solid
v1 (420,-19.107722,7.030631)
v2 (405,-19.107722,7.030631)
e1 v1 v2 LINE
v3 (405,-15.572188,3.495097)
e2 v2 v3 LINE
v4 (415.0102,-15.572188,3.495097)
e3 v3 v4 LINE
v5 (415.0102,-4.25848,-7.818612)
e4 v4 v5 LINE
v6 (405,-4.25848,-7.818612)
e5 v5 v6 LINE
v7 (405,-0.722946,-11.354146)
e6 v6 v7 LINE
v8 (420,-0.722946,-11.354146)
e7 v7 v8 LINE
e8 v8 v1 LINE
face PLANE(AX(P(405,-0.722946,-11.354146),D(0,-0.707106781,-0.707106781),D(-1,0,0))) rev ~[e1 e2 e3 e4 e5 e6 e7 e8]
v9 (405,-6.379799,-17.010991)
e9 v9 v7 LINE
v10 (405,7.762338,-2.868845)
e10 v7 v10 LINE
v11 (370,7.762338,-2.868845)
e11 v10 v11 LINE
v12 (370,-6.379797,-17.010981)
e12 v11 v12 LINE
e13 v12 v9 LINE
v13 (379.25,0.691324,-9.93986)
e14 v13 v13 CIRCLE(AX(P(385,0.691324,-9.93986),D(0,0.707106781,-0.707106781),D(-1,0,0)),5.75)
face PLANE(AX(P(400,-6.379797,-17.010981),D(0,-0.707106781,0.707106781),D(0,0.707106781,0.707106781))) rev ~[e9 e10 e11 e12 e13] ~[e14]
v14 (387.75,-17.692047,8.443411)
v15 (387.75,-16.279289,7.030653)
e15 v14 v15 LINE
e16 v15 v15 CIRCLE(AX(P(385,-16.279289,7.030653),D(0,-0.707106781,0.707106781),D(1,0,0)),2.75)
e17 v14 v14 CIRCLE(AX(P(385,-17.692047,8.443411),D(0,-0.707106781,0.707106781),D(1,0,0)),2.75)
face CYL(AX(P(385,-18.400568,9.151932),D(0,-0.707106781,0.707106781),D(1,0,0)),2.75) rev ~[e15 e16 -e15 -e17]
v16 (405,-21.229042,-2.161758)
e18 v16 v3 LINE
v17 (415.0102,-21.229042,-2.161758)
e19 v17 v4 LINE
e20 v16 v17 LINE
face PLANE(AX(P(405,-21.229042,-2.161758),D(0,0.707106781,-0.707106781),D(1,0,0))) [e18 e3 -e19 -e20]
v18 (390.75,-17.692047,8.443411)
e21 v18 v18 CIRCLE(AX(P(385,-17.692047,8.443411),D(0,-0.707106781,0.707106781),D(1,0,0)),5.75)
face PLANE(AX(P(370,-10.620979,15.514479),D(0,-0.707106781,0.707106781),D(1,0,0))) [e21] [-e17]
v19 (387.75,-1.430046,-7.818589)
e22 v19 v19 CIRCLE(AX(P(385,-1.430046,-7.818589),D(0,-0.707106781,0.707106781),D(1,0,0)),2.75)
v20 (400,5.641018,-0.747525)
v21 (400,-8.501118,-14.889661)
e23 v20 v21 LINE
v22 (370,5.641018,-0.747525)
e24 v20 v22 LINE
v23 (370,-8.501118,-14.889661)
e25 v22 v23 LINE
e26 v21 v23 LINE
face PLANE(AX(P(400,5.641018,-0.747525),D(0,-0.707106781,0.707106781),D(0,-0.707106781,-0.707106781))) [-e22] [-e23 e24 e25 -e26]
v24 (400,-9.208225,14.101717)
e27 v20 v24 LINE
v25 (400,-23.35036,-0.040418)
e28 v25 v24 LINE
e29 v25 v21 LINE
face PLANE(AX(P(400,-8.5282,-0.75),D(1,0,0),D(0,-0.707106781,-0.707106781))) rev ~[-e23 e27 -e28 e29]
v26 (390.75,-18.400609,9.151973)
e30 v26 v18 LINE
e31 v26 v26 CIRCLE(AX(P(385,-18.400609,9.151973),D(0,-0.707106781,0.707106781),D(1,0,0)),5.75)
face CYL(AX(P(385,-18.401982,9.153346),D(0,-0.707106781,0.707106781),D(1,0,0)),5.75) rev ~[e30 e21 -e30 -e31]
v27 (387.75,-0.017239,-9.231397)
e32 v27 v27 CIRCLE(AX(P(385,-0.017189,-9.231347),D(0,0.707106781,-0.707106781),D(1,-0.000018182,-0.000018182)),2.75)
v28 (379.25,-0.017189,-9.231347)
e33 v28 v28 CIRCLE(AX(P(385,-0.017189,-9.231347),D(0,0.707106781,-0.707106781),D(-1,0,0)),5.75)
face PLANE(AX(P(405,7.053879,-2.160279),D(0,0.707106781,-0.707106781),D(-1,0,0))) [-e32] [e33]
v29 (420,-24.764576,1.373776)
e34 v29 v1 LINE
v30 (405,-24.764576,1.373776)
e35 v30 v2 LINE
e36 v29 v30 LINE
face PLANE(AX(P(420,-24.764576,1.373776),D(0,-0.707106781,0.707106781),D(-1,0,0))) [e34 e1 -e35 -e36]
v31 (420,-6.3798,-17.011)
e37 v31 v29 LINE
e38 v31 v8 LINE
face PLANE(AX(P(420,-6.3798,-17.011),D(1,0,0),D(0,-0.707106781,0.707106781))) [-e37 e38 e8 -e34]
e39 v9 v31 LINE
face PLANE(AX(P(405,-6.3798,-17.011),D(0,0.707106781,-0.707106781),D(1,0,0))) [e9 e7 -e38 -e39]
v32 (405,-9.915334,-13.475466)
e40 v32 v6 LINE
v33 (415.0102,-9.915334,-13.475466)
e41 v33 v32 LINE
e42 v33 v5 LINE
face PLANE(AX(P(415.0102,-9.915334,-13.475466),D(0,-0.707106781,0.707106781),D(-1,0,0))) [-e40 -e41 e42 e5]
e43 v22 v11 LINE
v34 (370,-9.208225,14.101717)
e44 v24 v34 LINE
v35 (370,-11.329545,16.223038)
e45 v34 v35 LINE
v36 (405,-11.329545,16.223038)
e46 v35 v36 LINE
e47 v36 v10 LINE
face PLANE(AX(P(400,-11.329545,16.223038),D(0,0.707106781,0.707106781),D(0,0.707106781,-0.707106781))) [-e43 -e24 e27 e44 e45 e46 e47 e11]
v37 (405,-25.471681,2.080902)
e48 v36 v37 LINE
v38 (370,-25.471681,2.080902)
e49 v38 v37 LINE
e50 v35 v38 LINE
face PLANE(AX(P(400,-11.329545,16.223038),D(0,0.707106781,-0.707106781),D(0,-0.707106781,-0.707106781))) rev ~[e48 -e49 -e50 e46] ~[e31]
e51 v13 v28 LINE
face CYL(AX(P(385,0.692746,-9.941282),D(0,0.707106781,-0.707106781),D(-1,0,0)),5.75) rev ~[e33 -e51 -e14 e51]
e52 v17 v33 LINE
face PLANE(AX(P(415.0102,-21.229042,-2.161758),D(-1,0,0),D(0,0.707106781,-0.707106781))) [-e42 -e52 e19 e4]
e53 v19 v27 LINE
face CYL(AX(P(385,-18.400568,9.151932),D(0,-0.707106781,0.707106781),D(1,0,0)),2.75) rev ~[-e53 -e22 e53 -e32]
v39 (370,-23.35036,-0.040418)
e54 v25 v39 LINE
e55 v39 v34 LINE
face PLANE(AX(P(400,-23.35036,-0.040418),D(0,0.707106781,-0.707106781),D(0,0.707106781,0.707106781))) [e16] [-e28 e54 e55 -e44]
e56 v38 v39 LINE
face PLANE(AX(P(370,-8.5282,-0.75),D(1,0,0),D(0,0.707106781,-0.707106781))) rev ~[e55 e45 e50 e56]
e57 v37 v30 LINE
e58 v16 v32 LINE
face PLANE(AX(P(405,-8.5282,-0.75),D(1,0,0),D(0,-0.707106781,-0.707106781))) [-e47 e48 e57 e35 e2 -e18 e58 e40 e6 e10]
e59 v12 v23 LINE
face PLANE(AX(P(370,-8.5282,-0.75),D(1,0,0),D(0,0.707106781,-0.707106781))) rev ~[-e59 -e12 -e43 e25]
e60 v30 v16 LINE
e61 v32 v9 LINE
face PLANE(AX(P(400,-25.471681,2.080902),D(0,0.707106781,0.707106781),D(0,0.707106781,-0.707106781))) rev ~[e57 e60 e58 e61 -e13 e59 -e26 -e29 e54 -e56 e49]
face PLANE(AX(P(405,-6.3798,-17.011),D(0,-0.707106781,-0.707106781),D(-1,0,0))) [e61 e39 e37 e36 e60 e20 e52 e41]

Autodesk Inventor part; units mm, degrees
ref_plane "YZ Plane" through (0, 0, 0) normal (1, 0, 0) x (0, 1, 0)
ref_plane "XZ Plane" through (0, 0, 0) normal (0, 1, 0) x (-1, 0, 0)
ref_plane "XY Plane" through (0, 0, 0) normal (0, 0, 1) x (1, 0, 0)
ref_plane "Work Plane1" through (400, -8.5282, -0.75) normal (1, 0, 0) x (0, 0.7071068, -0.7071068)
sketch "Sketch1" plane through (400, -8.5282, -0.75) normal (1, 0, 0) x (0, 0.7071068, -0.7071068)
  line L0 (-10.9826, 10.0209) -> (10.0174, 10.0209)
  line L1 (10.0174, 10.0209) -> (10.0174, -9.9791)
  line L2 (10.0174, -9.9791) -> (-10.9826, -9.9791)
  line L3 (-10.9826, -9.9791) -> (-10.9826, 10.0209)
  line L4 (10.0174, 10.0209) -> (13.0174, 10.0209)
  line L5 (13.0174, 10.0209) -> (13.0174, -9.9791)
  line L6 (13.0174, -9.9791) -> (10.0174, -9.9791)
  line L7 (10.0174, -9.9791) -> (10.0174, 10.0209)
  line L8 (-10.9826, 10.0209) -> (-13.9826, 10.0209)
  line L9 (-13.9826, 10.0209) -> (-13.9826, -9.9791)
  line L10 (-13.9826, -9.9791) -> (-10.9826, -9.9791)
  line L11 (-10.9826, -9.9791) -> (-10.9826, 10.0209)
  point P0 (5.5, 6.5607)
  point P1 (10.0174, -9.9791)
  point P2 (-10.9826, -9.9791)
  dimension "d0" = 21
  dimension "d1" = 20
  dimension "d2" = 3
  dimension "d3" = 20
  dimension "d4" = 3
  dimension "d5" = 20
extrude "Extrusion1" add sketch "Sketch1" against normal blind 30 contours L3 L10 L9 L8 | L4 L5 L6 L1
sketch "Sketch2" plane through (400, -8.5282, -0.75) normal (1, 0, 0) x (0, -0.7071068, -0.7071068)
  line L0 (-10.0209, -13.9826) -> (-10.0209, -10.9826) projected
  line L1 (9.9791, 13.0174) -> (9.9791, 10.0174) projected
  line L2 (-10.0209, -13.9826) -> (9.9791, -13.9826)
  line L3 (9.9791, -13.9826) -> (9.9791, 13.0174)
  line L4 (9.9791, 13.0174) -> (-10.0209, 13.0174)
  line L5 (-10.0209, 13.0174) -> (-10.0209, -13.9826)
  point P0 (-6.5607, 5.5)
extrude "Extrusion2" add sketch "Sketch2" along normal blind 5
sketch "Sketch3" plane through (405, -6.3798, -17.011) normal (0, -0.7071068, -0.7071068) x (-1, 0, 0)
  line L0 (35, 0) -> (0, 0) projected
  line L1 (0, 0) -> (-15, 0)
  line L2 (-15, 0) -> (-15, -26)
  line L3 (-15, -26) -> (0, -26)
  line L4 (0, -26) -> (0, 0)
  line L5 (-10.0102, -5) -> (0, -5)
  line L6 (0, -5) -> (0, -21)
  line L7 (0, -21) -> (-10.0102, -21)
  line L8 (-10.0102, -21) -> (-10.0102, -5)
  point P0 (405, -7.5174)
  point P1 (0, -21)
  point P2 (0, -5)
  dimension "d10" = 15
  dimension "d11" = 26
  dimension "d12" = 0
  dimension "d13" = 5
  dimension "d14" = 16
extrude "Extrusion3" add sketch "Sketch3" against normal blind 8 contours L4 L5 L8 L7 L3 L2 L1
sketch "Sketch4" plane through (370, -11.3295, 16.223) normal (0, -0.7071068, 0.7071068) x (1, 0, 0)
  circle A0 centre (15, -10) radius 2.75
  line L0 (0, -20) -> (50, -20) projected
  line L1 (0, -20) -> (0, 0) projected
  point P0 (-370, -3.4602)
  dimension "d17" = 5.5
  dimension "d18" = 10
  dimension "d19" = 15
extrude "Extrusion4" cut sketch "Sketch4" against normal through all
sketch "Sketch5" plane through (370, -11.3295, 16.223) normal (0, -0.7071068, 0.7071068) x (1, 0, 0)
  circle A0 centre (15, -10) radius 2.75 projected
  circle A1 centre (15, -10) radius 5.75
  point P0 (-370, -3.4602)
  dimension "d22" = 11.5
extrude "Extrusion5" cut sketch "Sketch5" against normal blind 1 contours A0 | A1
sketch "Sketch6" plane through (405, 7.7624, -2.8688) normal (0, 0.7071068, -0.7071068) x (-1, 0, 0)
  circle A0 centre (20, -10) radius 2.75 projected
  circle A1 centre (20, -10) radius 5.75
  point P0 (405, -3.4602)
  dimension "d25" = 11.5
extrude "Extrusion6" cut sketch "Sketch6" against normal blind 1
equation "\"d14\" = d11 - 2 * d13"
properties part number "StrapHolder"
